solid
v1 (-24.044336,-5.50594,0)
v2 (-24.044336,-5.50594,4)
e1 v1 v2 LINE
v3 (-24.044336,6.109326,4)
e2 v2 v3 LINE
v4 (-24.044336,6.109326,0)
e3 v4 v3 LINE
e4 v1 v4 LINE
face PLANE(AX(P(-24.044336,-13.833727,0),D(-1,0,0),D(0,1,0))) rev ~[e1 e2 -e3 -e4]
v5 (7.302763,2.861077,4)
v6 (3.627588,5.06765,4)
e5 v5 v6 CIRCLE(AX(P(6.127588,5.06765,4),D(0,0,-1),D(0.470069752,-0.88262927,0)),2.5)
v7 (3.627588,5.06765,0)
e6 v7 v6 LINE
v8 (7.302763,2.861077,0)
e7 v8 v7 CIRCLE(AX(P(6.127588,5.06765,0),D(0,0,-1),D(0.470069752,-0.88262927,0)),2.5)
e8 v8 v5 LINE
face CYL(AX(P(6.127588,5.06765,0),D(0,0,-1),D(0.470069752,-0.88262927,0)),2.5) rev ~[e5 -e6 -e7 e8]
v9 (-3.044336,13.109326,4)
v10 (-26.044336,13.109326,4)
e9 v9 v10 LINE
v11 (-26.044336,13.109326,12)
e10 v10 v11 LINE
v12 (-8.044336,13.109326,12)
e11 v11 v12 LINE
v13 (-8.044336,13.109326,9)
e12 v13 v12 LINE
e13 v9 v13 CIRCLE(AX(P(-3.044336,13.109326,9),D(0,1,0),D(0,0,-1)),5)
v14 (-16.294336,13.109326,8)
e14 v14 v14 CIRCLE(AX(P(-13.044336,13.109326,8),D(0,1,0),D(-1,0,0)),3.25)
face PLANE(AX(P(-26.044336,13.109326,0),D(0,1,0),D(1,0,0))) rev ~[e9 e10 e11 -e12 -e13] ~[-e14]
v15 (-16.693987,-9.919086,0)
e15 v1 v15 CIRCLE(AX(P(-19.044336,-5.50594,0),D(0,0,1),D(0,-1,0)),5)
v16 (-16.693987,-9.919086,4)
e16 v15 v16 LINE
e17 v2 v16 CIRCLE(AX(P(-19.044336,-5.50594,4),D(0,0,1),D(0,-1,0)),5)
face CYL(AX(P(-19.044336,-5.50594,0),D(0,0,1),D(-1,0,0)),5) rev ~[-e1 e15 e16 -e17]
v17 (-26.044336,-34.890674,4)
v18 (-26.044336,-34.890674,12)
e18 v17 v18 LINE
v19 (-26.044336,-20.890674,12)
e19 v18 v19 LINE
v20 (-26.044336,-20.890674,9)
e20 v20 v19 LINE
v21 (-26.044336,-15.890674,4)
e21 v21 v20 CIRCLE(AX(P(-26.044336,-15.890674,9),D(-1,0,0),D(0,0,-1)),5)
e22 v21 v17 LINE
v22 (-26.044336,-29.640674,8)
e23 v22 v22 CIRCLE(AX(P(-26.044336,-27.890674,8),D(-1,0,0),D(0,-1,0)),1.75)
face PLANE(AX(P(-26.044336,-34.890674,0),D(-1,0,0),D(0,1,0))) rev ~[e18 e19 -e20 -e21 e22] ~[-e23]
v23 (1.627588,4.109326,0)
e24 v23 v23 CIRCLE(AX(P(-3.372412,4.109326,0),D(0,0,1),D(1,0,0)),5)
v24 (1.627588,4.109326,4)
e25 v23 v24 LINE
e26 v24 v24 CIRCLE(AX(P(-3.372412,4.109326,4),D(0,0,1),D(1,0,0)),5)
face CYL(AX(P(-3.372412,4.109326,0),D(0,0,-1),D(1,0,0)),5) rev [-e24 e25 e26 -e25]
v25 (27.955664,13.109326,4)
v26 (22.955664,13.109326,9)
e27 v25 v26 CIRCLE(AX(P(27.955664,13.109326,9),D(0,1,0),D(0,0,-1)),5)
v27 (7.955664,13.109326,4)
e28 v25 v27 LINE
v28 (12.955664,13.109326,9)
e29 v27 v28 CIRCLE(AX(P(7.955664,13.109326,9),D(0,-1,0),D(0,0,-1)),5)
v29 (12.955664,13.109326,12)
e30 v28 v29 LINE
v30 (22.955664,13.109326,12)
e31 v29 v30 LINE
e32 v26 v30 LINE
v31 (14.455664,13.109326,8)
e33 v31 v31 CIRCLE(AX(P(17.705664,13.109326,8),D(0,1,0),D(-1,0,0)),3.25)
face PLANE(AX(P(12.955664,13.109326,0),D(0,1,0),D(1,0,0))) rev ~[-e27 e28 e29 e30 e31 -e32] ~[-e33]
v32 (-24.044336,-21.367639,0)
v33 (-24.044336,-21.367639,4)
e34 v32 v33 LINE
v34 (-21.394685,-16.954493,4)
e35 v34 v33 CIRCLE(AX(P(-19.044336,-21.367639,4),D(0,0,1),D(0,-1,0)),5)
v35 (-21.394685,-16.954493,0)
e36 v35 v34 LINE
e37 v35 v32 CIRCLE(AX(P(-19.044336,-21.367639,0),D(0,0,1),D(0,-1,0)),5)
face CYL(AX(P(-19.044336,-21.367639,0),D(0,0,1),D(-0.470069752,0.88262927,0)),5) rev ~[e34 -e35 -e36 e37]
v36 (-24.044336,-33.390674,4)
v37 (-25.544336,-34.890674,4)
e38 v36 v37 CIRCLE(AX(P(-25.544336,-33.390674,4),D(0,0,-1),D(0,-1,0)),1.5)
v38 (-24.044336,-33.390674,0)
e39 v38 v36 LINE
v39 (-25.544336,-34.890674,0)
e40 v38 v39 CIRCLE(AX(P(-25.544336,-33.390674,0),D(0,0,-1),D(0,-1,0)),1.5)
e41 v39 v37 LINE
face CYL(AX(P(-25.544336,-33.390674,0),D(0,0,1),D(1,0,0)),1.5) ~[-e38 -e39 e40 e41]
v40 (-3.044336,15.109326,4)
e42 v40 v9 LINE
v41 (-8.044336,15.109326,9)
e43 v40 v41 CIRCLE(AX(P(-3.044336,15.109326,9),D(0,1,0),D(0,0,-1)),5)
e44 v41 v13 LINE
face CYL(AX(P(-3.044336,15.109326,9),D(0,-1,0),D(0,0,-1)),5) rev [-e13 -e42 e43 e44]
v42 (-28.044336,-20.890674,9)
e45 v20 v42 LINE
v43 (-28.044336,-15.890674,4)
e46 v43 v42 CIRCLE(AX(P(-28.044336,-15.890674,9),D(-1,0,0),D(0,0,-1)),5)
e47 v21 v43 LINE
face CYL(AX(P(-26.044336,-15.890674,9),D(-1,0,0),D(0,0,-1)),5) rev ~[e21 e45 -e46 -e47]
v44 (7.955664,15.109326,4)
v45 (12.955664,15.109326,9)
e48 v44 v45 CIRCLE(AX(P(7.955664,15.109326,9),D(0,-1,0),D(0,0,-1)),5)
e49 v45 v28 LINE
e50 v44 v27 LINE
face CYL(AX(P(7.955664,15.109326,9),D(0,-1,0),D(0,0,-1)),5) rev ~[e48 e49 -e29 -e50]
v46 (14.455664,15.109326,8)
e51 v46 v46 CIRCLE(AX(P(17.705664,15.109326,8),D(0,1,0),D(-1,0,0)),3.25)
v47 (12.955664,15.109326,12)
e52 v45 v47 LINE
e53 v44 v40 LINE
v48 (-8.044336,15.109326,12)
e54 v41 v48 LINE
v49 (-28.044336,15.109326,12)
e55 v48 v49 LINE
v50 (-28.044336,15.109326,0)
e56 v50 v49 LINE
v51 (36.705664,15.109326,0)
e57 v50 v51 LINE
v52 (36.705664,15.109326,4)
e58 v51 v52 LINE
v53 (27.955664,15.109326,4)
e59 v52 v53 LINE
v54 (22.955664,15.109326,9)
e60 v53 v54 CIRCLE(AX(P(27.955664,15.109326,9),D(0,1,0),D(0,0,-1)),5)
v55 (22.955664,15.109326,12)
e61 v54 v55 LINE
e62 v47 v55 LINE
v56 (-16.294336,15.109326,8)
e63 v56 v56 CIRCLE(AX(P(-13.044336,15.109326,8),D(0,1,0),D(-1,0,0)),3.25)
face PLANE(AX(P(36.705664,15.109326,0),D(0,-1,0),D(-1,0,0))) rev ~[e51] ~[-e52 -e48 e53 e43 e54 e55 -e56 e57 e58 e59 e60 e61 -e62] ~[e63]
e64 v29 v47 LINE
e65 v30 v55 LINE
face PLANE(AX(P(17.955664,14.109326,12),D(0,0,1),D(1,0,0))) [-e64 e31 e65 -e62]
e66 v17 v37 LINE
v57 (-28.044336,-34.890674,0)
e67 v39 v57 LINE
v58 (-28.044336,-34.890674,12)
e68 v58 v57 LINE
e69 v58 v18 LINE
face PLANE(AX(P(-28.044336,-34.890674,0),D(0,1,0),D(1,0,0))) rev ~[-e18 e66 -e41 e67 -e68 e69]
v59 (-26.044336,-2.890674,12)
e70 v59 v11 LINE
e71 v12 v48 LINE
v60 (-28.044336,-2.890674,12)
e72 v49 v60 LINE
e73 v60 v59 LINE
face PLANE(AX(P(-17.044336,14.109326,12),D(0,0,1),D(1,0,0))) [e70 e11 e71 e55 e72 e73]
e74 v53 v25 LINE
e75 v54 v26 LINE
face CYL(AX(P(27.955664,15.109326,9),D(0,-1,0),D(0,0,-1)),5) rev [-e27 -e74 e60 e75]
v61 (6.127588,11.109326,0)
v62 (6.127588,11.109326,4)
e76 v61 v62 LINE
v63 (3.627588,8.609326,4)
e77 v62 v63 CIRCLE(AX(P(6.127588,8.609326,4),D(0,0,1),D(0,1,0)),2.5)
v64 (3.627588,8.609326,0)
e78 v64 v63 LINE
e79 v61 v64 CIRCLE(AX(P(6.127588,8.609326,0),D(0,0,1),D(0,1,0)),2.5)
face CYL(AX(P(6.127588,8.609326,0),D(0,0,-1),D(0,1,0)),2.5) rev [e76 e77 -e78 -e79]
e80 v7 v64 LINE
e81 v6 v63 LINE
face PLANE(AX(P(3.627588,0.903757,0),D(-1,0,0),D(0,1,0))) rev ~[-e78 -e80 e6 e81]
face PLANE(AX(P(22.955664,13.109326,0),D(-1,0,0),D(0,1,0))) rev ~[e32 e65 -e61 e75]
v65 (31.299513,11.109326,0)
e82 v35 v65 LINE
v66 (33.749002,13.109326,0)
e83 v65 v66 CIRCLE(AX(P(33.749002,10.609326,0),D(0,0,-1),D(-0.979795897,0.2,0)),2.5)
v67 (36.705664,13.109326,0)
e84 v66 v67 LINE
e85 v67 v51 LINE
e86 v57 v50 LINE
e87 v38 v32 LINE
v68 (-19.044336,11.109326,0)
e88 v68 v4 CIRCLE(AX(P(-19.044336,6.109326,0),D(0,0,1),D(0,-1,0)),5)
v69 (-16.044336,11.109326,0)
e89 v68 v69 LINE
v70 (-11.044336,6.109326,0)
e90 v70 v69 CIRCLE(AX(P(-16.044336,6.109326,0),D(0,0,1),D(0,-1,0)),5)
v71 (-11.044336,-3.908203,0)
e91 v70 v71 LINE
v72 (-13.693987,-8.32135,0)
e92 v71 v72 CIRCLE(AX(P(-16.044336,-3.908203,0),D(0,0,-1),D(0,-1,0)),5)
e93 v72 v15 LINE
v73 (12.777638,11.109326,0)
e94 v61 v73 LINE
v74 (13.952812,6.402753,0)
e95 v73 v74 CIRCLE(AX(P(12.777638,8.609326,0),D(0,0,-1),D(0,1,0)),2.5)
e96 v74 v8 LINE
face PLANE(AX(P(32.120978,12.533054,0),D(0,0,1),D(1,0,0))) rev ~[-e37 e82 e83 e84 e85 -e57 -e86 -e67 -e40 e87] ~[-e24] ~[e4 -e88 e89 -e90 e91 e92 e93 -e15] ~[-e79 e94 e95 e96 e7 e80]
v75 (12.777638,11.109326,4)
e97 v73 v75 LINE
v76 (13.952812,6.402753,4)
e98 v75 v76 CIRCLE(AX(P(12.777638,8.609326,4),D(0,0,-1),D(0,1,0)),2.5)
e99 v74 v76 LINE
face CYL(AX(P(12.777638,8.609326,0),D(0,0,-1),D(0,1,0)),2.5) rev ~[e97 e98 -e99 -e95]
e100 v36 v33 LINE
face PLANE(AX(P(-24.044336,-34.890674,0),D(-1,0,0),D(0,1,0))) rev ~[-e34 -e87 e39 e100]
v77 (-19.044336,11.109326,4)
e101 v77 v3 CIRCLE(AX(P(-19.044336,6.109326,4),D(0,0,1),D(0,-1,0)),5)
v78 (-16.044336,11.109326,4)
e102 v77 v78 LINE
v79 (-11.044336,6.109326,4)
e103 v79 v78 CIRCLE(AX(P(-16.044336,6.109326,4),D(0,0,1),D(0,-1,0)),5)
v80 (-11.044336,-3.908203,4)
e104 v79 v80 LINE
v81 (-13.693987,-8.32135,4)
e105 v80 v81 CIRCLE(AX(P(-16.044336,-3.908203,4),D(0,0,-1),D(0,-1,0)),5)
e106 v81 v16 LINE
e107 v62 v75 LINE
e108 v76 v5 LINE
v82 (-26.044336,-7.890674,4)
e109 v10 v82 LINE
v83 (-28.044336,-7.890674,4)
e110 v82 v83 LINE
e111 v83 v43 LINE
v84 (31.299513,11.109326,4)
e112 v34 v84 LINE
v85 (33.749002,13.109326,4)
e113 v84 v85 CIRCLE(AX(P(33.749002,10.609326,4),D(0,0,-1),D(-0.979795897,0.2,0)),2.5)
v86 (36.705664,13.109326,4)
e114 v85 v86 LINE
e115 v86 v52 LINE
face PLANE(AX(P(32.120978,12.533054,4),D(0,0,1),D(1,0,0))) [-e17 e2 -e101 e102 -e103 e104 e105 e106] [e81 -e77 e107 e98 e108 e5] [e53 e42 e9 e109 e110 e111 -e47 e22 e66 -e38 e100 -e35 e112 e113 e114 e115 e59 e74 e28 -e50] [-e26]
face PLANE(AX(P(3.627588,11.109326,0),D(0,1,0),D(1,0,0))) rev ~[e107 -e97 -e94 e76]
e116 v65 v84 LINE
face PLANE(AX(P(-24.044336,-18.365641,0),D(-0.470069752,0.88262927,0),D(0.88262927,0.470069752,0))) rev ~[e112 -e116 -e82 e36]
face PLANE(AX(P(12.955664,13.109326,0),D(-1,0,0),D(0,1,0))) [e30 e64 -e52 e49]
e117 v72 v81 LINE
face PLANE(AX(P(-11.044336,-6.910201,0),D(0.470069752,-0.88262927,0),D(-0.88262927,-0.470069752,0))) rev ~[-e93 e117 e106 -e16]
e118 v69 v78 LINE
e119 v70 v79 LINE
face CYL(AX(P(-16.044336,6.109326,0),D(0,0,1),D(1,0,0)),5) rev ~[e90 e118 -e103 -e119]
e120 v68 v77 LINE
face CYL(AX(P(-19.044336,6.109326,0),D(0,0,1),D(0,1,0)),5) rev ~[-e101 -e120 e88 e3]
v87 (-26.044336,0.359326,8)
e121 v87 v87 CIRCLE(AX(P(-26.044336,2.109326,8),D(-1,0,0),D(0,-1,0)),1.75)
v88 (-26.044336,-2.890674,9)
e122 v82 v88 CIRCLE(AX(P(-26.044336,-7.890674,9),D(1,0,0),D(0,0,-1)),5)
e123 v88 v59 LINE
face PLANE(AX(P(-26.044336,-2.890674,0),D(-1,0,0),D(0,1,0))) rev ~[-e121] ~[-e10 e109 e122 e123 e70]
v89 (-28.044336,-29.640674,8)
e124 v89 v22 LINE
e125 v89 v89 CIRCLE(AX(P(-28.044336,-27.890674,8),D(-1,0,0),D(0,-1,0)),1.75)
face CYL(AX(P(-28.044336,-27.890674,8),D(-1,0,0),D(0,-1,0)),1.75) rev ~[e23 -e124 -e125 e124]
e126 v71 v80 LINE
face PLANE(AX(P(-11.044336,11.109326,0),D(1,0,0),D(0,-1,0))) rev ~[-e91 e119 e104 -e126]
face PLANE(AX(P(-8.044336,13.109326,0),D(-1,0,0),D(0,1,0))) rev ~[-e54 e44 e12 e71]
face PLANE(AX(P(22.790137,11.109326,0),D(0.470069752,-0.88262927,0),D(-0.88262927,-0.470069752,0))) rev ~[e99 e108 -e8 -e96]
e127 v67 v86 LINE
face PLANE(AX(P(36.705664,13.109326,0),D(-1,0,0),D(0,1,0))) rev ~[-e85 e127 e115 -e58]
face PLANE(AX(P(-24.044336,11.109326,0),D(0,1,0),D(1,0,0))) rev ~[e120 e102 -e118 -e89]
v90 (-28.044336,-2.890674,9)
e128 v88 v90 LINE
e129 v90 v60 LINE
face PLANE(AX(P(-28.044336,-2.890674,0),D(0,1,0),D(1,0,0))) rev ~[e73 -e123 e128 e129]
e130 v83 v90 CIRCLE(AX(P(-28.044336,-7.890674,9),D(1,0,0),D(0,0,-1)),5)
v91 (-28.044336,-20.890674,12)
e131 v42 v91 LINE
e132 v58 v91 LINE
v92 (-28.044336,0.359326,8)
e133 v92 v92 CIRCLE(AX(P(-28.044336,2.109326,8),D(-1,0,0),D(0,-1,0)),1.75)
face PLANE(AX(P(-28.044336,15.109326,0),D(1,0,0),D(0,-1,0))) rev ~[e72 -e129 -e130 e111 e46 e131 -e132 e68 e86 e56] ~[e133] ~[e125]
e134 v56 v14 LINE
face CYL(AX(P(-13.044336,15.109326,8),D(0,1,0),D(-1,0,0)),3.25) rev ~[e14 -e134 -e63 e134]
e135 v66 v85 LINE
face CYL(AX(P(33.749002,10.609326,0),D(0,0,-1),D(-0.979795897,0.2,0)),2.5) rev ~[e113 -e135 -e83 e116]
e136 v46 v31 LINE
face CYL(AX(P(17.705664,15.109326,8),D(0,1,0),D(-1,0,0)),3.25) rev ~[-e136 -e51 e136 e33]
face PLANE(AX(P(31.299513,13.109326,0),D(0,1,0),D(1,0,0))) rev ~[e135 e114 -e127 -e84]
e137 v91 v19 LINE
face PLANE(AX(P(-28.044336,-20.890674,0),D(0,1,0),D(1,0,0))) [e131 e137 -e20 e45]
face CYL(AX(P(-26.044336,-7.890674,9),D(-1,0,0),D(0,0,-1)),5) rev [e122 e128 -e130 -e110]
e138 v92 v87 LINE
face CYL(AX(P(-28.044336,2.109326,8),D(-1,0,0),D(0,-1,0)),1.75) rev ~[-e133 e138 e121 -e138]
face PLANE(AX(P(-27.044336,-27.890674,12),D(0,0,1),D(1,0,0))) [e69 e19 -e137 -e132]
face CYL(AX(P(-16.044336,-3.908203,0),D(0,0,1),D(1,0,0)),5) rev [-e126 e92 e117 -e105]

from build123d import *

# Parameters (mm, degrees)
F0_R        = 5
F1_DEPTH    = 4
F2_W        = 10
F2_H        = 2
F2_W_2      = 18
F2_W_3      = 2
F2_H_2      = 14
F3_DEPTH    = 12
F4_R        = 5
F5_T1_DEPTH = 4
F6_R        = 1.5
F7_R        = 3.25
F9_DEPTH    = 2
F8_R        = 1.75
F10_DEPTH   = 2


# Not quite as in the source:
# - a fillet or chamfer that OpenCascade refuses, or shapes differently, is made with other operations: its cross-section is extruded or revolved along the edge and cut away or added


with BuildPart() as f1:
    # F0 (on Top) → F1 (new body)
    with BuildSketch(Plane.XY):
        Polygon((-24.0443362383, -18.3656413368), (31.299512524, 11.1093264446), (31.299512524, 13.1093264446), (36.7056637617, 13.1093264446), (36.7056637617, 15.1093264446), (-28.0443362383, 15.1093264446), (-28.0443362383, -34.8906735554), (-24.0443362383, -34.8906735554), align=None)
        Polygon((-24.0443362383, -13.8337272738), (-24.0443362383, 11.1093264446), (-11.0443362383, 11.1093264446), (3.6275881428, 11.1093264446), (22.7901370984, 11.1093264446), (3.6275881428, 0.9037566169), (-11.0443362383, -6.9102011778), align=None, mode=Mode.SUBTRACT)
        Polygon((3.6275881428, 11.1093264446), (-11.0443362383, 11.1093264446), (-11.0443362383, -6.9102011778), (3.6275881428, 0.9037566169), align=None)
        with Locations((-3.3724118572, 4.1093264446)):
            Circle(F0_R, mode=Mode.SUBTRACT)
    extrude(amount=F1_DEPTH)

    # F2 (on Top) → F3 (join)
    with BuildSketch(Plane.XY):
        with Locations((17.9556637617, 14.1093264446)):
            Rectangle(F2_W, F2_H)
        with Locations((-17.0443362383, 14.1093264446)):
            Rectangle(F2_W_2, F2_H)
        Polygon((-26.0443362383, 15.1093264446), (-28.0443362383, 15.1093264446), (-28.0443362383, -2.8906735554), (-26.0443362383, -2.8906735554), (-26.0443362383, 13.1093264446), align=None)
        with Locations((-27.0443362383, -27.8906735554)):
            Rectangle(F2_W_3, F2_H_2)
    extrude(amount=F3_DEPTH)

    # F4
    f4_edges = [f1.edges().sort_by_distance(p)[0] for p in [
        (-24.044336, 11.109326, 2),
        (-24.044336, -13.833727, 2),
        (-11.044336, -6.910201, 2),
        (-11.044336, 11.109326, 2),
        (-24.044336, -18.365641, 2),
        (-27.044336, -2.890674, 4),
        (-27.044336, -20.890674, 4),
        (-8.044336, 14.109326, 4),
        (12.955664, 14.109326, 4),
        (22.955664, 14.109326, 4),
    ]]
    fillet(f4_edges, radius=F4_R)

    # F5: fillet of radius 2.5 on 4 edges, made by hand

    # F5_s2 → F5_t1 (join)
    with BuildSketch(Plane.XY):
        with BuildLine():
            ThreePointArc((31.299512524, 11.1093264446), (32.1678634367, 12.5458181177), (33.7490022668, 13.1093264446))
            Line((33.7490022668, 13.1093264446), (31.299512524, 13.1093264446))
            Line((31.299512524, 13.1093264446), (31.299512524, 11.1093264446))
        make_face()
        with BuildLine():
            ThreePointArc((6.1275881428, 11.1093264446), (4.3598211899, 10.3770933976), (3.6275881428, 8.6093264446))
            Line((3.6275881428, 8.6093264446), (3.6275881428, 11.1093264446))
            Line((3.6275881428, 11.1093264446), (6.1275881428, 11.1093264446))
        make_face()
        with BuildLine():
            ThreePointArc((7.302762524, 2.8610770581), (4.840719065, 2.9242958576), (3.6275881428, 5.0676502325))
            Line((3.6275881428, 5.0676502325), (3.6275881428, 0.9037566169))
            Line((3.6275881428, 0.9037566169), (7.302762524, 2.8610770581))
        make_face()
        with BuildLine():
            ThreePointArc((12.7776375713, 11.1093264446), (15.2031718358, 9.2149530062), (13.9528119525, 6.4027532703))
            Line((13.9528119525, 6.4027532703), (22.7901370984, 11.1093264446))
            Line((22.7901370984, 11.1093264446), (12.7776375713, 11.1093264446))
        make_face()
    extrude(amount=F5_T1_DEPTH)

    # F6
    f6_edges = [f1.edges().sort_by_distance(p)[0] for p in [
        (-24.044336, -34.890674, 2),
    ]]
    fillet(f6_edges, radius=F6_R)

    # F7 (on face) → F9 (cut)
    with BuildSketch(Plane(origin=(0, 15.1093264446, 0), x_dir=(-1, 0, 0), z_dir=(0, 1, 0))):
        with Locations((-17.7056637617, 8)):
            Circle(F7_R)
        with Locations((13.0443362383, 8)):
            Circle(F7_R)
    extrude(amount=-F9_DEPTH, mode=Mode.SUBTRACT)

    # F8 (on face) → F10 (cut)
    with BuildSketch(Plane(origin=(-28.0443362383, 0, 0), x_dir=(0, -1, 0), z_dir=(-1, 0, 0))):
        with Locations((-2.1093264446, 8)):
            Circle(F8_R)
        with Locations((27.8906735554, 8)):
            Circle(F8_R)
    extrude(amount=-F10_DEPTH, mode=Mode.SUBTRACT)


solid = f1.part
